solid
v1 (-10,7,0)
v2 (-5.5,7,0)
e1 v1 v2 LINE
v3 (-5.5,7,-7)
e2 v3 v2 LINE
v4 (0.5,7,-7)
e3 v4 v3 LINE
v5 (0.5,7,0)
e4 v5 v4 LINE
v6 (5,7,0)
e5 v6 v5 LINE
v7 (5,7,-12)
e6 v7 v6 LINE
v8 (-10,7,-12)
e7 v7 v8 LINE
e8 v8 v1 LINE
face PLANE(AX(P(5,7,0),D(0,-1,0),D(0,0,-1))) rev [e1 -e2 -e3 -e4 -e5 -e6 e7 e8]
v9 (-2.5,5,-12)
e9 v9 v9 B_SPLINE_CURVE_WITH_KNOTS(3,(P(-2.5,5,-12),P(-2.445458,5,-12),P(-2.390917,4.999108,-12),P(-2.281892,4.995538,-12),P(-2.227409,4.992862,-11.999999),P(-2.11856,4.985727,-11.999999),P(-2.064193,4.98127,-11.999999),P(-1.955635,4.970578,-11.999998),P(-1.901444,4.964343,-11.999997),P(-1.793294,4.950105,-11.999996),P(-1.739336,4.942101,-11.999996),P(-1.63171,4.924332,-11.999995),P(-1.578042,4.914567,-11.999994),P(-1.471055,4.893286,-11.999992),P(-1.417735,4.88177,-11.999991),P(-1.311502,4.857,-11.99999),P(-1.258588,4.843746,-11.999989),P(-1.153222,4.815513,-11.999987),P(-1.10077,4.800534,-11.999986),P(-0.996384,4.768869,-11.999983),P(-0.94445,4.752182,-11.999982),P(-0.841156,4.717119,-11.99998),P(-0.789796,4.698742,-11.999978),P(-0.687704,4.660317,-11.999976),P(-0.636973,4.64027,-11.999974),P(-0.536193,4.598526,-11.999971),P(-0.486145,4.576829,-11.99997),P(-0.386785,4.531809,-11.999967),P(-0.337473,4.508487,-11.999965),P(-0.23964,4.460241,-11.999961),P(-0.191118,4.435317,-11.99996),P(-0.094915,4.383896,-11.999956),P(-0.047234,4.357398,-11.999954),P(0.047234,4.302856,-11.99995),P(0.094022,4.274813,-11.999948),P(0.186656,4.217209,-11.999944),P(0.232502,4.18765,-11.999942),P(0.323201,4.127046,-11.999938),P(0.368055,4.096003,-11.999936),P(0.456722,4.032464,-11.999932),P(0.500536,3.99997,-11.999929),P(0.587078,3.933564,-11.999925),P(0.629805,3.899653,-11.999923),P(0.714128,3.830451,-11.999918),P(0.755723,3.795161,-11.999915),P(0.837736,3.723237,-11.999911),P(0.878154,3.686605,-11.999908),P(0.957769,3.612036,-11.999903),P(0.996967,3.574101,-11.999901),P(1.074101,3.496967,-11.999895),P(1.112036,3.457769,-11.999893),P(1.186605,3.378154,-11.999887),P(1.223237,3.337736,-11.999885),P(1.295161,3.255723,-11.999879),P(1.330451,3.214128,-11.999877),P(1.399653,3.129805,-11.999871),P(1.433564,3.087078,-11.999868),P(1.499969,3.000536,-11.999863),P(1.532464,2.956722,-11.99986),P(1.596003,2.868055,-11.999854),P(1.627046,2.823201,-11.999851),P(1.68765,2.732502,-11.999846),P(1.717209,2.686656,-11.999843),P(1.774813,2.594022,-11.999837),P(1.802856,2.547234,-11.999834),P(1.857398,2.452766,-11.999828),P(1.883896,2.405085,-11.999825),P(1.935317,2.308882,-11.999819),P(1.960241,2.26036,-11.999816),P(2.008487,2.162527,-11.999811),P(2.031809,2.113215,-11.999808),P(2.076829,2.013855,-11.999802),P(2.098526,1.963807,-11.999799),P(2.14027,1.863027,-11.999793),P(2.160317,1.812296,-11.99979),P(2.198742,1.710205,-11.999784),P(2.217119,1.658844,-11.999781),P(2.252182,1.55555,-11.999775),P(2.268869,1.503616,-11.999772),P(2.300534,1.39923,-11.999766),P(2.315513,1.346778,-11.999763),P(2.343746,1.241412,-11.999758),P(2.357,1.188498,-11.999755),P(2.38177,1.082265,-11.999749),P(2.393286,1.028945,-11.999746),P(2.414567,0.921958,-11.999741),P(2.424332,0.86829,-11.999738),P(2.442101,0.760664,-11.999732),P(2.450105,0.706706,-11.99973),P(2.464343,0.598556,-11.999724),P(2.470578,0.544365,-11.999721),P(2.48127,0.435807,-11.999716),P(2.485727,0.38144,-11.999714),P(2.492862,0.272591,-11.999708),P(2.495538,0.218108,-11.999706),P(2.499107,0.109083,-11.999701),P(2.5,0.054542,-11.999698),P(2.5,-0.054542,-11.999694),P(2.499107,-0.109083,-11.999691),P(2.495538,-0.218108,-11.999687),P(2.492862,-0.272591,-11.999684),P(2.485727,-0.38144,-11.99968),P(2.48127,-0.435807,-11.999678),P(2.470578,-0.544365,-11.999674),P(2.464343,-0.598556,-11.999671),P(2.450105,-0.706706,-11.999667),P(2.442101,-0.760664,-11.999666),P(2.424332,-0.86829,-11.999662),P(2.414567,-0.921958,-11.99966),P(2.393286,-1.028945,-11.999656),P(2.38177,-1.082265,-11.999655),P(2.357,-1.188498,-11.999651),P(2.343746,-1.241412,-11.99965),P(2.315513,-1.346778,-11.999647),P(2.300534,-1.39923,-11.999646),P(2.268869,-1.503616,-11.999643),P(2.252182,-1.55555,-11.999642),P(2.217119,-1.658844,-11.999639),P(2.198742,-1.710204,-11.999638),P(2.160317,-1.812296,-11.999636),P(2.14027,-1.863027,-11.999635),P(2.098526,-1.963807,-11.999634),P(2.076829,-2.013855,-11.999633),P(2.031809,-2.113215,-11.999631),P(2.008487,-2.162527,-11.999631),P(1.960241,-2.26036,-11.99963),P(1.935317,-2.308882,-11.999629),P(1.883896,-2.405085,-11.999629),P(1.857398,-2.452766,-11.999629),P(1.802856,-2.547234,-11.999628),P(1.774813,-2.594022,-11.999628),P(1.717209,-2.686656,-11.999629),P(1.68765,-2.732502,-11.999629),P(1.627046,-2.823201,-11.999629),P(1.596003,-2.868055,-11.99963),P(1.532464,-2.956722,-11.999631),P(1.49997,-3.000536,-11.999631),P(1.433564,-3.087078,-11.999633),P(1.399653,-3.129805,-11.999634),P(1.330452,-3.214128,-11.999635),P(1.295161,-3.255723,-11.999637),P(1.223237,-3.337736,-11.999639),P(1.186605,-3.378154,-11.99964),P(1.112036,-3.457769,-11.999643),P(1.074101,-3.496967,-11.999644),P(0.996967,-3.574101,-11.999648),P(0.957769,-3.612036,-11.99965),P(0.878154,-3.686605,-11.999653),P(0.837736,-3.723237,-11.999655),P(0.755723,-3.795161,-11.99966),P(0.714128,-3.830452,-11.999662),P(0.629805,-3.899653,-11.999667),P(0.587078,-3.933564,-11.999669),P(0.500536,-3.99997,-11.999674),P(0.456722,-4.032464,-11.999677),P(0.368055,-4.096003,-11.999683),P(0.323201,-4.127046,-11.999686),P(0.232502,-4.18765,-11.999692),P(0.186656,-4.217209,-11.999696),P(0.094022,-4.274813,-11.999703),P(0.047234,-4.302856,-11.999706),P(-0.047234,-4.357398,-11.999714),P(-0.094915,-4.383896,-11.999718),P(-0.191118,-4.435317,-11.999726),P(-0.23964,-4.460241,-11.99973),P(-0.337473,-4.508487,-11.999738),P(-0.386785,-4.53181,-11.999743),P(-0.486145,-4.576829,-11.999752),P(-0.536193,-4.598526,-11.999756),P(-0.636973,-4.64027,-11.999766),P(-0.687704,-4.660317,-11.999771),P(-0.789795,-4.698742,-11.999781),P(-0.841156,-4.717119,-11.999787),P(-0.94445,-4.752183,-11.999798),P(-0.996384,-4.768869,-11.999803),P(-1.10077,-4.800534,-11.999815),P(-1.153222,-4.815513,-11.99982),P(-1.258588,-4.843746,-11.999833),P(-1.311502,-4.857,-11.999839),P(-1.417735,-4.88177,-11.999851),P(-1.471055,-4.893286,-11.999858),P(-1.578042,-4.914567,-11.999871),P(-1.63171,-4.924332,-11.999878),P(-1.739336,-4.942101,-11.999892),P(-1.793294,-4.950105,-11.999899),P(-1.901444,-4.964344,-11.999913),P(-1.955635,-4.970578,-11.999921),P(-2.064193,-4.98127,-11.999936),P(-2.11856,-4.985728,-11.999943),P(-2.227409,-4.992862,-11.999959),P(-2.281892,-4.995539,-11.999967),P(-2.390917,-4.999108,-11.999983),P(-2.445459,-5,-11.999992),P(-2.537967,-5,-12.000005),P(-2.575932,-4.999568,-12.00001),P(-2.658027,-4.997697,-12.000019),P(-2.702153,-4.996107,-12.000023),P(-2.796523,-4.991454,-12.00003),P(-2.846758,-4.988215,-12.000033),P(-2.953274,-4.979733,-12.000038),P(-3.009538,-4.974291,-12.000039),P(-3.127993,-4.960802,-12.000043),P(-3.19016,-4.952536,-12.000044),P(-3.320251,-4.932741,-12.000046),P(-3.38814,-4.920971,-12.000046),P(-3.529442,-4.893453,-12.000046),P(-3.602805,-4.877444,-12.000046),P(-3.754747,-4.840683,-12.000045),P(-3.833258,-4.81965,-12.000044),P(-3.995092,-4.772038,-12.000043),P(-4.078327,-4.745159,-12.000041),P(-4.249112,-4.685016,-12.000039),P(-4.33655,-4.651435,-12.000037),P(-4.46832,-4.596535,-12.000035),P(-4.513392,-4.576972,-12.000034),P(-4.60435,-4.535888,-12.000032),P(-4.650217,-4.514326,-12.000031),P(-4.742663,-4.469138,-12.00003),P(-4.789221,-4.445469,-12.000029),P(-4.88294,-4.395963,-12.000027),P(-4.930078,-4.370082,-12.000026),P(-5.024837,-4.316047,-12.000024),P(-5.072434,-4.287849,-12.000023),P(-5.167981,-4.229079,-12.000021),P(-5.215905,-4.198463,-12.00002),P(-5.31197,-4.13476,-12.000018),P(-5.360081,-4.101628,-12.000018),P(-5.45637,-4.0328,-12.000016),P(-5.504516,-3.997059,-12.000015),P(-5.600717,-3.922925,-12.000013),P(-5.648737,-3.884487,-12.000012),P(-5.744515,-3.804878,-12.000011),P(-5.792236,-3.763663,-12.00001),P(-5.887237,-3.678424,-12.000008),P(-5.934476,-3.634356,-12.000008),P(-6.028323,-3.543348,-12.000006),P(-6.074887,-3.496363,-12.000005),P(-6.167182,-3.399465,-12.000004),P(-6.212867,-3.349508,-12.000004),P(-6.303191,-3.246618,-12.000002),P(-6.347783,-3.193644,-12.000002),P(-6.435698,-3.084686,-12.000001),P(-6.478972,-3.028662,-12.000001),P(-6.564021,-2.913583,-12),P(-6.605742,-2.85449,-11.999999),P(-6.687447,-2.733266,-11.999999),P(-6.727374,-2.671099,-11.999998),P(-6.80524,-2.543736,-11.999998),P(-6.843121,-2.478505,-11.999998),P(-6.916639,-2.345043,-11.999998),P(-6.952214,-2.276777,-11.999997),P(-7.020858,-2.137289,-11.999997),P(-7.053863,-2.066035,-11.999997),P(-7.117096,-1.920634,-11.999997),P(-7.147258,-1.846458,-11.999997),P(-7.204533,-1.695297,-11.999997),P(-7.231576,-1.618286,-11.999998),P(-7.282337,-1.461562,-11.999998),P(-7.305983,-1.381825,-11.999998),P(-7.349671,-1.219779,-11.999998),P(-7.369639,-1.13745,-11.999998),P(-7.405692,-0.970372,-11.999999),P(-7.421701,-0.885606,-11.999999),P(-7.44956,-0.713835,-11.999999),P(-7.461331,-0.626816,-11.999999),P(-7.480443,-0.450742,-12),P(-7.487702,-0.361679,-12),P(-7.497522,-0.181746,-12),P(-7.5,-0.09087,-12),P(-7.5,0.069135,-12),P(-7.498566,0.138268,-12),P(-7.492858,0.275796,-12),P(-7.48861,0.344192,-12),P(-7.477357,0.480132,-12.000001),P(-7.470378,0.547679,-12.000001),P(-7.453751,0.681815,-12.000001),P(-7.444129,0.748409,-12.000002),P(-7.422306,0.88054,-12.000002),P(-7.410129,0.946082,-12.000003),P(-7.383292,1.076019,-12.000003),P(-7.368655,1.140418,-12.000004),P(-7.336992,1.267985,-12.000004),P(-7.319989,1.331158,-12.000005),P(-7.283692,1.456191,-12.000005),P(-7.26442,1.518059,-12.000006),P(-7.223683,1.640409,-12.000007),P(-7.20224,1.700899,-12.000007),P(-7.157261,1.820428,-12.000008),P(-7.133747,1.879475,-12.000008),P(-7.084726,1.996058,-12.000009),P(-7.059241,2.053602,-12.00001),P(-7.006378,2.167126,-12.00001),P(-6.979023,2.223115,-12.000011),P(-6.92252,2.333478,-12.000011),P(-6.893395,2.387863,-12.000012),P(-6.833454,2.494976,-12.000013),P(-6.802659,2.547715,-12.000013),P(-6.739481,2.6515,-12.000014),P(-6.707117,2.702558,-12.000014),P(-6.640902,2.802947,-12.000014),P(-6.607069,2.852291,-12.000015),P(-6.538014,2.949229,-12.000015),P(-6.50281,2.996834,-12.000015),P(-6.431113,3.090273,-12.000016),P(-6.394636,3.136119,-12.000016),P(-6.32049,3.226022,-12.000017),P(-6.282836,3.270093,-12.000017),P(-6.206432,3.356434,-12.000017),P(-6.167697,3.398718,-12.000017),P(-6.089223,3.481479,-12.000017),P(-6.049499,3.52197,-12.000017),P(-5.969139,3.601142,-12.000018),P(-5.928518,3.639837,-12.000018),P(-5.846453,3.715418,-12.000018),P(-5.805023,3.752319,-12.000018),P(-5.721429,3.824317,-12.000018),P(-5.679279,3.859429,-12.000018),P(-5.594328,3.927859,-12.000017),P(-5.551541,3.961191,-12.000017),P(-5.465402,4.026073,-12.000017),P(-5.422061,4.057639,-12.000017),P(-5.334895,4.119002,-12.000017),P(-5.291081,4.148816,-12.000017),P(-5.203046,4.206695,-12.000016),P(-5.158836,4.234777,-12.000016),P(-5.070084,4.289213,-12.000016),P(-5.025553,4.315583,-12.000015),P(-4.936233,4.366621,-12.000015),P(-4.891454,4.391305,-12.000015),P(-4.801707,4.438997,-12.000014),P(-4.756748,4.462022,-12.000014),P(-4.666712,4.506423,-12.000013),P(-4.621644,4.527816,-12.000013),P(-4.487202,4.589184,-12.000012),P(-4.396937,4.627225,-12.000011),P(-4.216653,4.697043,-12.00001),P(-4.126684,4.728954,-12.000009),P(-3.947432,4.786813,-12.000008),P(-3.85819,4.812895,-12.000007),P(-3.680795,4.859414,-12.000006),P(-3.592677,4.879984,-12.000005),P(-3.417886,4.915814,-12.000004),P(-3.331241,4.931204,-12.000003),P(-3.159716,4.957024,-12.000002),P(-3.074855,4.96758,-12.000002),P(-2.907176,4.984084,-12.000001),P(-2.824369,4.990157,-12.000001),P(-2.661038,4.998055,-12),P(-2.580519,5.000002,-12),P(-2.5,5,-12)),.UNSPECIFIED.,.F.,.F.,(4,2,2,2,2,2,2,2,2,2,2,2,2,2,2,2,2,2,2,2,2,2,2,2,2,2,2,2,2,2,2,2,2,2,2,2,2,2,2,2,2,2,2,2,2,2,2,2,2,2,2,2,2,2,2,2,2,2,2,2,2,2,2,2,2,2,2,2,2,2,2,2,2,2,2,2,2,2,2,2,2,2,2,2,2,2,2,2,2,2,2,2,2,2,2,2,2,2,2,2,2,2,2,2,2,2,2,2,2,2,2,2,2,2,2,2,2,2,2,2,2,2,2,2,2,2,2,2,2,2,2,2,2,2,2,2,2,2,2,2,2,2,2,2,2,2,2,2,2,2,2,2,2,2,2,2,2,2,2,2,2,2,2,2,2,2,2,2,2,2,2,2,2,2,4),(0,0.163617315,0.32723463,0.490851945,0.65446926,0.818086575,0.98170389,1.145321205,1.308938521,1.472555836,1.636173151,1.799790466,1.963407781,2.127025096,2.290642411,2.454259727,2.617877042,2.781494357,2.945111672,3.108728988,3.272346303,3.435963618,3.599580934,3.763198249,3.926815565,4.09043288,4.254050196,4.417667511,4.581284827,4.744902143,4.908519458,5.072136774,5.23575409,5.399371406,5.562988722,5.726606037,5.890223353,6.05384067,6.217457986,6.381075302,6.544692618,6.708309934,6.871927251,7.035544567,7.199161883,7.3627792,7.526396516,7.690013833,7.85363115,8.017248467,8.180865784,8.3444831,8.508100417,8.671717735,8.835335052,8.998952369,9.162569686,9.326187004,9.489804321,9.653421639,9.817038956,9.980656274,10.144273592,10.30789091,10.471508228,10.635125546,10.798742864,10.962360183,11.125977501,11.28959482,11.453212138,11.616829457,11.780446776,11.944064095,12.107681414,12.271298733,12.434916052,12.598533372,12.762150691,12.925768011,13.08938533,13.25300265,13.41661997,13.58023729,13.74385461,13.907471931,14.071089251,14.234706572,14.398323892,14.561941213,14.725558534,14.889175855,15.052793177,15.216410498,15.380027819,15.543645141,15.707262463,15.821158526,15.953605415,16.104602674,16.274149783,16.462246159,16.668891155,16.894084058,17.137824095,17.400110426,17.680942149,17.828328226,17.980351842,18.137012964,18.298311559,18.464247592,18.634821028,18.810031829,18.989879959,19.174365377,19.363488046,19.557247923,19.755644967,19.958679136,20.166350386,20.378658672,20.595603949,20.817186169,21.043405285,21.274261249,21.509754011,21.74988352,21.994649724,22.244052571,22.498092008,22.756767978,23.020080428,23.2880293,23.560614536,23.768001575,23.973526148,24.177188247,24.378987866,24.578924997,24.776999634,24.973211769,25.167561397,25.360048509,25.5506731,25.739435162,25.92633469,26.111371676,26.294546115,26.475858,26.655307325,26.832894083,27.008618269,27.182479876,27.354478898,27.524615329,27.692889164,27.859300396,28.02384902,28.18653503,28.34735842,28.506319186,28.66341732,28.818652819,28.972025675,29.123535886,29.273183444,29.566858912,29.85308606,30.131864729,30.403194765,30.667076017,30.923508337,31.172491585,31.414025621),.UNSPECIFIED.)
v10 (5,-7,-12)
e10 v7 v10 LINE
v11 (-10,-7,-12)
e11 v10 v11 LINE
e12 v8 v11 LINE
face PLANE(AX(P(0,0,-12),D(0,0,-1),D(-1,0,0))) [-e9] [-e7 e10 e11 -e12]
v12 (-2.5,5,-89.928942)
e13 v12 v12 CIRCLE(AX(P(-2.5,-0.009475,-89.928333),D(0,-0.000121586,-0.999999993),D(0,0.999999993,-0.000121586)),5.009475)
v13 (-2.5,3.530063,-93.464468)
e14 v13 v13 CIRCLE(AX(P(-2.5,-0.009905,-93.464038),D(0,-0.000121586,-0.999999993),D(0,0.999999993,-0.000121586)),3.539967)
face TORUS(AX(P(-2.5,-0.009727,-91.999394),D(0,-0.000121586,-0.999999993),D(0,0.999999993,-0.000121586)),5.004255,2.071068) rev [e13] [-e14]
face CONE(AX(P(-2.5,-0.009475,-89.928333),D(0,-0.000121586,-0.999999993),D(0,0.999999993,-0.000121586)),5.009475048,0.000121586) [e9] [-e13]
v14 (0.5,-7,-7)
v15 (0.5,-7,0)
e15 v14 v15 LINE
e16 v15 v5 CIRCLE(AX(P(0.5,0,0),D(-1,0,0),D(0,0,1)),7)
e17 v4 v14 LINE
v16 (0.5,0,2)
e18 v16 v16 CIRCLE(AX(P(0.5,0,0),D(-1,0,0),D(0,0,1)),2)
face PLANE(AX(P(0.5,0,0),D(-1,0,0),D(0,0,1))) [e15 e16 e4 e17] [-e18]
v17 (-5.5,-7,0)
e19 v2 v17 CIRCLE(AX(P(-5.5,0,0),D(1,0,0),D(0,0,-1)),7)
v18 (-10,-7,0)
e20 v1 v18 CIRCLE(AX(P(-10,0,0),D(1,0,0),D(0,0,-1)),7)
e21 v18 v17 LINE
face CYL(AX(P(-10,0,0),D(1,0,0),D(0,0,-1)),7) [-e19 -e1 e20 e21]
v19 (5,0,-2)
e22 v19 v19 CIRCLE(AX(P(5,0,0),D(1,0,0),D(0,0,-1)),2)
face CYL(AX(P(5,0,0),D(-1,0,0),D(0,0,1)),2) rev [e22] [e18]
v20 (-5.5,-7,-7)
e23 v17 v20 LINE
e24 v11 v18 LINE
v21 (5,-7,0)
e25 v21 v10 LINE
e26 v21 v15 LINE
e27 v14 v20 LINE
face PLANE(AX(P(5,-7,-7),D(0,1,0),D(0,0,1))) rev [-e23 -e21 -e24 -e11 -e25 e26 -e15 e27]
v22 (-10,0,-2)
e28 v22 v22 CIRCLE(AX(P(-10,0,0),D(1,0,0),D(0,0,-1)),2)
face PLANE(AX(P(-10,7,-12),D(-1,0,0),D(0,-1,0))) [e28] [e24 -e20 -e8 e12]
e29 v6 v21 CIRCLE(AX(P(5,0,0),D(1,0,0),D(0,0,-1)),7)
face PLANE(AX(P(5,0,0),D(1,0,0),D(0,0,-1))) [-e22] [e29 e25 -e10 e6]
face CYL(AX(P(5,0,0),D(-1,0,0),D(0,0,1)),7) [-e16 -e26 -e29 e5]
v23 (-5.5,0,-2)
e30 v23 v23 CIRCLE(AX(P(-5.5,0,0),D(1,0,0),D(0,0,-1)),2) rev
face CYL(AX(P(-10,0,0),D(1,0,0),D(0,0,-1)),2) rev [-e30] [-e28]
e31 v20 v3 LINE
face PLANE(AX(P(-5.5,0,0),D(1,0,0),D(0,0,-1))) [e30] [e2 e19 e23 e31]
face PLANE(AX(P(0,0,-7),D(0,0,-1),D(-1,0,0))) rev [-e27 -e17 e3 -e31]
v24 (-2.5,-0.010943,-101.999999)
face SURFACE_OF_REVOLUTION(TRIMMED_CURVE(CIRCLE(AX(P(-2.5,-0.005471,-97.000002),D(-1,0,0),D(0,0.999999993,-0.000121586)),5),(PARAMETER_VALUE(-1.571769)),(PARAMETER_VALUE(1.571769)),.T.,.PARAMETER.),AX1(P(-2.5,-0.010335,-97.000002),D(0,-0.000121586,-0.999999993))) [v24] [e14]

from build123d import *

# Parameters (mm, degrees)
SKETCH_1_R          = 2
EXTRUDE_1_DEPTH     = 5
SKETCH_2_W          = 15
SKETCH_2_H          = 14
EXTRUDE_2_DEPTH     = 5
CUT_EXTRUDE_1_DEPTH = 0.5
CUT_EXTRUDE_2_DEPTH = 0.5


# Read off the part's stored shape, not the designer's step: 旋转1
with BuildPart() as part:
    # 草图1 → 凸台-拉伸1 (new body)
    with BuildSketch(Plane(origin=(0, 0, 0), x_dir=(0, 0, -1), z_dir=(1, 0, 0))):
        with BuildLine():
            Line((0, 7), (7, 7))
            Line((7, 7), (7, -7))
            Line((7, -7), (0, -7))
            ThreePointArc((0, -7), (-7, 0), (0, 7))
        make_face()
        Circle(SKETCH_1_R, mode=Mode.SUBTRACT)
    extrude_1 = extrude(amount=EXTRUDE_1_DEPTH)

    # 草图2 → 凸台-拉伸2 (add)
    with BuildSketch(Plane(origin=(0, 0, -7), x_dir=(-1, 0, 0), z_dir=(0, 0, -1))):
        with Locations((2.5, 0)):
            Rectangle(SKETCH_2_W, SKETCH_2_H)
    extrude(amount=EXTRUDE_2_DEPTH)

    # 镜向1: 凸台-拉伸1 across plane
    add(extrude_1.mirror(Plane(origin=(-2.5, 0, 0), x_dir=(0, 0, 1), z_dir=(1, 0, 0))))

    # 旋转1 outline → 旋转1 (revolve)
    with BuildSketch(Plane(origin=(-2.5, 0.001459035, -1.77e-07), x_dir=(1, 0, 0), z_dir=(0, -0.9999999926083961, 0.00012158621526376601))):
        with BuildLine():
            Line((0, -11.99939198), (0, -101.999999911))
            add(Edge.make_bspline(
                [(0, -101.999999911), (0.649374565, -102.000631552), (1.36637391, -101.896134883), (2.14664433, -101.640285677), (2.900713445, -101.175064609), (4.050280545, -100.025777019), (4.488587079, -99.403162649), (4.802259983, -98.694270687), (4.967920299, -97.947271844), (5.003923175, -97.131598303), (5.005854013, -97.042976085), (5.00581972, -96.954701862), (5.003854844, -96.866858155), (4.962482411, -95.929533068), (4.746118591, -95.128843425), (4.388787557, -94.446984897), (3.976314487, -93.90027946), (3.539967456, -93.464038525)],
                knots=[7.026698353, 7.026698353, 7.026698353, 7.026698353, 7.026698353, 7.026698353, 7.854954324, 7.854954324, 7.854954324, 7.854954324, 8.516146676, 8.516146676, 8.516146676, 8.516146676, 8.597007798, 8.597007798, 8.597007798, 8.597007798, 9.38398712, 9.38398712, 9.38398712, 9.38398712, 9.38398712, 9.38398712], degree=5, weights=[1, 1, 1.002166416, 1.000644588, 1, 1, 0.998171528, 0.998141501, 1, 1, 0.999999762, 0.999999775, 1, 1, 1.000698327, 1.001864653, 1, 1]))
            ThreePointArc((3.539967456, -93.464038525), (3.091790234, -91.204536808), (5.009475048, -89.928333148))
            Line((5.009475048, -89.928333148), (4.999999963, -11.99939198))
            Line((4.999999963, -11.99939198), (0, -11.99939198))
        make_face()
    revolve(axis=Axis((-2.5, 0.001459035, -1.77e-07), (0, 0.00012158621526376601, 0.9999999926083961)))

    # 草图5 → 切除-拉伸1 (cut)
    with BuildSketch(Plane.ZY):
        with BuildLine():
            Line((-7, 7), (-7, -7))
            Line((-7, -7), (0, -7))
            ThreePointArc((0, -7), (7, 0), (0, 7))
            Line((0, 7), (-7, 7))
        make_face()
    extrude(amount=-CUT_EXTRUDE_1_DEPTH, mode=Mode.SUBTRACT)


with BuildPart() as mirror_2_1:
    # 镜向2: 凸台-拉伸1 across plane
    add(extrude_1.mirror(Plane(origin=(-2.5, 0, 0), x_dir=(0, 0, 1), z_dir=(1, 0, 0))))


with BuildPart() as part_1:
    add(part.part)

    # 镜向2 united with what the copies tou: union 镜向2_1
    add(mirror_2_1.part)

    # 草图6 → 切除-拉伸2 (cut)
    with BuildSketch(Plane(origin=(-5, 0, 0), x_dir=(0, 0, -1), z_dir=(1, 0, 0))):
        with BuildLine():
            Line((0, 7), (7, 7))
            Line((7, 7), (7, -7))
            Line((7, -7), (0, -7))
            ThreePointArc((0, -7), (-7, 0), (0, 7))
        make_face()
    extrude(amount=-CUT_EXTRUDE_2_DEPTH, mode=Mode.SUBTRACT)


solid = part_1.part
